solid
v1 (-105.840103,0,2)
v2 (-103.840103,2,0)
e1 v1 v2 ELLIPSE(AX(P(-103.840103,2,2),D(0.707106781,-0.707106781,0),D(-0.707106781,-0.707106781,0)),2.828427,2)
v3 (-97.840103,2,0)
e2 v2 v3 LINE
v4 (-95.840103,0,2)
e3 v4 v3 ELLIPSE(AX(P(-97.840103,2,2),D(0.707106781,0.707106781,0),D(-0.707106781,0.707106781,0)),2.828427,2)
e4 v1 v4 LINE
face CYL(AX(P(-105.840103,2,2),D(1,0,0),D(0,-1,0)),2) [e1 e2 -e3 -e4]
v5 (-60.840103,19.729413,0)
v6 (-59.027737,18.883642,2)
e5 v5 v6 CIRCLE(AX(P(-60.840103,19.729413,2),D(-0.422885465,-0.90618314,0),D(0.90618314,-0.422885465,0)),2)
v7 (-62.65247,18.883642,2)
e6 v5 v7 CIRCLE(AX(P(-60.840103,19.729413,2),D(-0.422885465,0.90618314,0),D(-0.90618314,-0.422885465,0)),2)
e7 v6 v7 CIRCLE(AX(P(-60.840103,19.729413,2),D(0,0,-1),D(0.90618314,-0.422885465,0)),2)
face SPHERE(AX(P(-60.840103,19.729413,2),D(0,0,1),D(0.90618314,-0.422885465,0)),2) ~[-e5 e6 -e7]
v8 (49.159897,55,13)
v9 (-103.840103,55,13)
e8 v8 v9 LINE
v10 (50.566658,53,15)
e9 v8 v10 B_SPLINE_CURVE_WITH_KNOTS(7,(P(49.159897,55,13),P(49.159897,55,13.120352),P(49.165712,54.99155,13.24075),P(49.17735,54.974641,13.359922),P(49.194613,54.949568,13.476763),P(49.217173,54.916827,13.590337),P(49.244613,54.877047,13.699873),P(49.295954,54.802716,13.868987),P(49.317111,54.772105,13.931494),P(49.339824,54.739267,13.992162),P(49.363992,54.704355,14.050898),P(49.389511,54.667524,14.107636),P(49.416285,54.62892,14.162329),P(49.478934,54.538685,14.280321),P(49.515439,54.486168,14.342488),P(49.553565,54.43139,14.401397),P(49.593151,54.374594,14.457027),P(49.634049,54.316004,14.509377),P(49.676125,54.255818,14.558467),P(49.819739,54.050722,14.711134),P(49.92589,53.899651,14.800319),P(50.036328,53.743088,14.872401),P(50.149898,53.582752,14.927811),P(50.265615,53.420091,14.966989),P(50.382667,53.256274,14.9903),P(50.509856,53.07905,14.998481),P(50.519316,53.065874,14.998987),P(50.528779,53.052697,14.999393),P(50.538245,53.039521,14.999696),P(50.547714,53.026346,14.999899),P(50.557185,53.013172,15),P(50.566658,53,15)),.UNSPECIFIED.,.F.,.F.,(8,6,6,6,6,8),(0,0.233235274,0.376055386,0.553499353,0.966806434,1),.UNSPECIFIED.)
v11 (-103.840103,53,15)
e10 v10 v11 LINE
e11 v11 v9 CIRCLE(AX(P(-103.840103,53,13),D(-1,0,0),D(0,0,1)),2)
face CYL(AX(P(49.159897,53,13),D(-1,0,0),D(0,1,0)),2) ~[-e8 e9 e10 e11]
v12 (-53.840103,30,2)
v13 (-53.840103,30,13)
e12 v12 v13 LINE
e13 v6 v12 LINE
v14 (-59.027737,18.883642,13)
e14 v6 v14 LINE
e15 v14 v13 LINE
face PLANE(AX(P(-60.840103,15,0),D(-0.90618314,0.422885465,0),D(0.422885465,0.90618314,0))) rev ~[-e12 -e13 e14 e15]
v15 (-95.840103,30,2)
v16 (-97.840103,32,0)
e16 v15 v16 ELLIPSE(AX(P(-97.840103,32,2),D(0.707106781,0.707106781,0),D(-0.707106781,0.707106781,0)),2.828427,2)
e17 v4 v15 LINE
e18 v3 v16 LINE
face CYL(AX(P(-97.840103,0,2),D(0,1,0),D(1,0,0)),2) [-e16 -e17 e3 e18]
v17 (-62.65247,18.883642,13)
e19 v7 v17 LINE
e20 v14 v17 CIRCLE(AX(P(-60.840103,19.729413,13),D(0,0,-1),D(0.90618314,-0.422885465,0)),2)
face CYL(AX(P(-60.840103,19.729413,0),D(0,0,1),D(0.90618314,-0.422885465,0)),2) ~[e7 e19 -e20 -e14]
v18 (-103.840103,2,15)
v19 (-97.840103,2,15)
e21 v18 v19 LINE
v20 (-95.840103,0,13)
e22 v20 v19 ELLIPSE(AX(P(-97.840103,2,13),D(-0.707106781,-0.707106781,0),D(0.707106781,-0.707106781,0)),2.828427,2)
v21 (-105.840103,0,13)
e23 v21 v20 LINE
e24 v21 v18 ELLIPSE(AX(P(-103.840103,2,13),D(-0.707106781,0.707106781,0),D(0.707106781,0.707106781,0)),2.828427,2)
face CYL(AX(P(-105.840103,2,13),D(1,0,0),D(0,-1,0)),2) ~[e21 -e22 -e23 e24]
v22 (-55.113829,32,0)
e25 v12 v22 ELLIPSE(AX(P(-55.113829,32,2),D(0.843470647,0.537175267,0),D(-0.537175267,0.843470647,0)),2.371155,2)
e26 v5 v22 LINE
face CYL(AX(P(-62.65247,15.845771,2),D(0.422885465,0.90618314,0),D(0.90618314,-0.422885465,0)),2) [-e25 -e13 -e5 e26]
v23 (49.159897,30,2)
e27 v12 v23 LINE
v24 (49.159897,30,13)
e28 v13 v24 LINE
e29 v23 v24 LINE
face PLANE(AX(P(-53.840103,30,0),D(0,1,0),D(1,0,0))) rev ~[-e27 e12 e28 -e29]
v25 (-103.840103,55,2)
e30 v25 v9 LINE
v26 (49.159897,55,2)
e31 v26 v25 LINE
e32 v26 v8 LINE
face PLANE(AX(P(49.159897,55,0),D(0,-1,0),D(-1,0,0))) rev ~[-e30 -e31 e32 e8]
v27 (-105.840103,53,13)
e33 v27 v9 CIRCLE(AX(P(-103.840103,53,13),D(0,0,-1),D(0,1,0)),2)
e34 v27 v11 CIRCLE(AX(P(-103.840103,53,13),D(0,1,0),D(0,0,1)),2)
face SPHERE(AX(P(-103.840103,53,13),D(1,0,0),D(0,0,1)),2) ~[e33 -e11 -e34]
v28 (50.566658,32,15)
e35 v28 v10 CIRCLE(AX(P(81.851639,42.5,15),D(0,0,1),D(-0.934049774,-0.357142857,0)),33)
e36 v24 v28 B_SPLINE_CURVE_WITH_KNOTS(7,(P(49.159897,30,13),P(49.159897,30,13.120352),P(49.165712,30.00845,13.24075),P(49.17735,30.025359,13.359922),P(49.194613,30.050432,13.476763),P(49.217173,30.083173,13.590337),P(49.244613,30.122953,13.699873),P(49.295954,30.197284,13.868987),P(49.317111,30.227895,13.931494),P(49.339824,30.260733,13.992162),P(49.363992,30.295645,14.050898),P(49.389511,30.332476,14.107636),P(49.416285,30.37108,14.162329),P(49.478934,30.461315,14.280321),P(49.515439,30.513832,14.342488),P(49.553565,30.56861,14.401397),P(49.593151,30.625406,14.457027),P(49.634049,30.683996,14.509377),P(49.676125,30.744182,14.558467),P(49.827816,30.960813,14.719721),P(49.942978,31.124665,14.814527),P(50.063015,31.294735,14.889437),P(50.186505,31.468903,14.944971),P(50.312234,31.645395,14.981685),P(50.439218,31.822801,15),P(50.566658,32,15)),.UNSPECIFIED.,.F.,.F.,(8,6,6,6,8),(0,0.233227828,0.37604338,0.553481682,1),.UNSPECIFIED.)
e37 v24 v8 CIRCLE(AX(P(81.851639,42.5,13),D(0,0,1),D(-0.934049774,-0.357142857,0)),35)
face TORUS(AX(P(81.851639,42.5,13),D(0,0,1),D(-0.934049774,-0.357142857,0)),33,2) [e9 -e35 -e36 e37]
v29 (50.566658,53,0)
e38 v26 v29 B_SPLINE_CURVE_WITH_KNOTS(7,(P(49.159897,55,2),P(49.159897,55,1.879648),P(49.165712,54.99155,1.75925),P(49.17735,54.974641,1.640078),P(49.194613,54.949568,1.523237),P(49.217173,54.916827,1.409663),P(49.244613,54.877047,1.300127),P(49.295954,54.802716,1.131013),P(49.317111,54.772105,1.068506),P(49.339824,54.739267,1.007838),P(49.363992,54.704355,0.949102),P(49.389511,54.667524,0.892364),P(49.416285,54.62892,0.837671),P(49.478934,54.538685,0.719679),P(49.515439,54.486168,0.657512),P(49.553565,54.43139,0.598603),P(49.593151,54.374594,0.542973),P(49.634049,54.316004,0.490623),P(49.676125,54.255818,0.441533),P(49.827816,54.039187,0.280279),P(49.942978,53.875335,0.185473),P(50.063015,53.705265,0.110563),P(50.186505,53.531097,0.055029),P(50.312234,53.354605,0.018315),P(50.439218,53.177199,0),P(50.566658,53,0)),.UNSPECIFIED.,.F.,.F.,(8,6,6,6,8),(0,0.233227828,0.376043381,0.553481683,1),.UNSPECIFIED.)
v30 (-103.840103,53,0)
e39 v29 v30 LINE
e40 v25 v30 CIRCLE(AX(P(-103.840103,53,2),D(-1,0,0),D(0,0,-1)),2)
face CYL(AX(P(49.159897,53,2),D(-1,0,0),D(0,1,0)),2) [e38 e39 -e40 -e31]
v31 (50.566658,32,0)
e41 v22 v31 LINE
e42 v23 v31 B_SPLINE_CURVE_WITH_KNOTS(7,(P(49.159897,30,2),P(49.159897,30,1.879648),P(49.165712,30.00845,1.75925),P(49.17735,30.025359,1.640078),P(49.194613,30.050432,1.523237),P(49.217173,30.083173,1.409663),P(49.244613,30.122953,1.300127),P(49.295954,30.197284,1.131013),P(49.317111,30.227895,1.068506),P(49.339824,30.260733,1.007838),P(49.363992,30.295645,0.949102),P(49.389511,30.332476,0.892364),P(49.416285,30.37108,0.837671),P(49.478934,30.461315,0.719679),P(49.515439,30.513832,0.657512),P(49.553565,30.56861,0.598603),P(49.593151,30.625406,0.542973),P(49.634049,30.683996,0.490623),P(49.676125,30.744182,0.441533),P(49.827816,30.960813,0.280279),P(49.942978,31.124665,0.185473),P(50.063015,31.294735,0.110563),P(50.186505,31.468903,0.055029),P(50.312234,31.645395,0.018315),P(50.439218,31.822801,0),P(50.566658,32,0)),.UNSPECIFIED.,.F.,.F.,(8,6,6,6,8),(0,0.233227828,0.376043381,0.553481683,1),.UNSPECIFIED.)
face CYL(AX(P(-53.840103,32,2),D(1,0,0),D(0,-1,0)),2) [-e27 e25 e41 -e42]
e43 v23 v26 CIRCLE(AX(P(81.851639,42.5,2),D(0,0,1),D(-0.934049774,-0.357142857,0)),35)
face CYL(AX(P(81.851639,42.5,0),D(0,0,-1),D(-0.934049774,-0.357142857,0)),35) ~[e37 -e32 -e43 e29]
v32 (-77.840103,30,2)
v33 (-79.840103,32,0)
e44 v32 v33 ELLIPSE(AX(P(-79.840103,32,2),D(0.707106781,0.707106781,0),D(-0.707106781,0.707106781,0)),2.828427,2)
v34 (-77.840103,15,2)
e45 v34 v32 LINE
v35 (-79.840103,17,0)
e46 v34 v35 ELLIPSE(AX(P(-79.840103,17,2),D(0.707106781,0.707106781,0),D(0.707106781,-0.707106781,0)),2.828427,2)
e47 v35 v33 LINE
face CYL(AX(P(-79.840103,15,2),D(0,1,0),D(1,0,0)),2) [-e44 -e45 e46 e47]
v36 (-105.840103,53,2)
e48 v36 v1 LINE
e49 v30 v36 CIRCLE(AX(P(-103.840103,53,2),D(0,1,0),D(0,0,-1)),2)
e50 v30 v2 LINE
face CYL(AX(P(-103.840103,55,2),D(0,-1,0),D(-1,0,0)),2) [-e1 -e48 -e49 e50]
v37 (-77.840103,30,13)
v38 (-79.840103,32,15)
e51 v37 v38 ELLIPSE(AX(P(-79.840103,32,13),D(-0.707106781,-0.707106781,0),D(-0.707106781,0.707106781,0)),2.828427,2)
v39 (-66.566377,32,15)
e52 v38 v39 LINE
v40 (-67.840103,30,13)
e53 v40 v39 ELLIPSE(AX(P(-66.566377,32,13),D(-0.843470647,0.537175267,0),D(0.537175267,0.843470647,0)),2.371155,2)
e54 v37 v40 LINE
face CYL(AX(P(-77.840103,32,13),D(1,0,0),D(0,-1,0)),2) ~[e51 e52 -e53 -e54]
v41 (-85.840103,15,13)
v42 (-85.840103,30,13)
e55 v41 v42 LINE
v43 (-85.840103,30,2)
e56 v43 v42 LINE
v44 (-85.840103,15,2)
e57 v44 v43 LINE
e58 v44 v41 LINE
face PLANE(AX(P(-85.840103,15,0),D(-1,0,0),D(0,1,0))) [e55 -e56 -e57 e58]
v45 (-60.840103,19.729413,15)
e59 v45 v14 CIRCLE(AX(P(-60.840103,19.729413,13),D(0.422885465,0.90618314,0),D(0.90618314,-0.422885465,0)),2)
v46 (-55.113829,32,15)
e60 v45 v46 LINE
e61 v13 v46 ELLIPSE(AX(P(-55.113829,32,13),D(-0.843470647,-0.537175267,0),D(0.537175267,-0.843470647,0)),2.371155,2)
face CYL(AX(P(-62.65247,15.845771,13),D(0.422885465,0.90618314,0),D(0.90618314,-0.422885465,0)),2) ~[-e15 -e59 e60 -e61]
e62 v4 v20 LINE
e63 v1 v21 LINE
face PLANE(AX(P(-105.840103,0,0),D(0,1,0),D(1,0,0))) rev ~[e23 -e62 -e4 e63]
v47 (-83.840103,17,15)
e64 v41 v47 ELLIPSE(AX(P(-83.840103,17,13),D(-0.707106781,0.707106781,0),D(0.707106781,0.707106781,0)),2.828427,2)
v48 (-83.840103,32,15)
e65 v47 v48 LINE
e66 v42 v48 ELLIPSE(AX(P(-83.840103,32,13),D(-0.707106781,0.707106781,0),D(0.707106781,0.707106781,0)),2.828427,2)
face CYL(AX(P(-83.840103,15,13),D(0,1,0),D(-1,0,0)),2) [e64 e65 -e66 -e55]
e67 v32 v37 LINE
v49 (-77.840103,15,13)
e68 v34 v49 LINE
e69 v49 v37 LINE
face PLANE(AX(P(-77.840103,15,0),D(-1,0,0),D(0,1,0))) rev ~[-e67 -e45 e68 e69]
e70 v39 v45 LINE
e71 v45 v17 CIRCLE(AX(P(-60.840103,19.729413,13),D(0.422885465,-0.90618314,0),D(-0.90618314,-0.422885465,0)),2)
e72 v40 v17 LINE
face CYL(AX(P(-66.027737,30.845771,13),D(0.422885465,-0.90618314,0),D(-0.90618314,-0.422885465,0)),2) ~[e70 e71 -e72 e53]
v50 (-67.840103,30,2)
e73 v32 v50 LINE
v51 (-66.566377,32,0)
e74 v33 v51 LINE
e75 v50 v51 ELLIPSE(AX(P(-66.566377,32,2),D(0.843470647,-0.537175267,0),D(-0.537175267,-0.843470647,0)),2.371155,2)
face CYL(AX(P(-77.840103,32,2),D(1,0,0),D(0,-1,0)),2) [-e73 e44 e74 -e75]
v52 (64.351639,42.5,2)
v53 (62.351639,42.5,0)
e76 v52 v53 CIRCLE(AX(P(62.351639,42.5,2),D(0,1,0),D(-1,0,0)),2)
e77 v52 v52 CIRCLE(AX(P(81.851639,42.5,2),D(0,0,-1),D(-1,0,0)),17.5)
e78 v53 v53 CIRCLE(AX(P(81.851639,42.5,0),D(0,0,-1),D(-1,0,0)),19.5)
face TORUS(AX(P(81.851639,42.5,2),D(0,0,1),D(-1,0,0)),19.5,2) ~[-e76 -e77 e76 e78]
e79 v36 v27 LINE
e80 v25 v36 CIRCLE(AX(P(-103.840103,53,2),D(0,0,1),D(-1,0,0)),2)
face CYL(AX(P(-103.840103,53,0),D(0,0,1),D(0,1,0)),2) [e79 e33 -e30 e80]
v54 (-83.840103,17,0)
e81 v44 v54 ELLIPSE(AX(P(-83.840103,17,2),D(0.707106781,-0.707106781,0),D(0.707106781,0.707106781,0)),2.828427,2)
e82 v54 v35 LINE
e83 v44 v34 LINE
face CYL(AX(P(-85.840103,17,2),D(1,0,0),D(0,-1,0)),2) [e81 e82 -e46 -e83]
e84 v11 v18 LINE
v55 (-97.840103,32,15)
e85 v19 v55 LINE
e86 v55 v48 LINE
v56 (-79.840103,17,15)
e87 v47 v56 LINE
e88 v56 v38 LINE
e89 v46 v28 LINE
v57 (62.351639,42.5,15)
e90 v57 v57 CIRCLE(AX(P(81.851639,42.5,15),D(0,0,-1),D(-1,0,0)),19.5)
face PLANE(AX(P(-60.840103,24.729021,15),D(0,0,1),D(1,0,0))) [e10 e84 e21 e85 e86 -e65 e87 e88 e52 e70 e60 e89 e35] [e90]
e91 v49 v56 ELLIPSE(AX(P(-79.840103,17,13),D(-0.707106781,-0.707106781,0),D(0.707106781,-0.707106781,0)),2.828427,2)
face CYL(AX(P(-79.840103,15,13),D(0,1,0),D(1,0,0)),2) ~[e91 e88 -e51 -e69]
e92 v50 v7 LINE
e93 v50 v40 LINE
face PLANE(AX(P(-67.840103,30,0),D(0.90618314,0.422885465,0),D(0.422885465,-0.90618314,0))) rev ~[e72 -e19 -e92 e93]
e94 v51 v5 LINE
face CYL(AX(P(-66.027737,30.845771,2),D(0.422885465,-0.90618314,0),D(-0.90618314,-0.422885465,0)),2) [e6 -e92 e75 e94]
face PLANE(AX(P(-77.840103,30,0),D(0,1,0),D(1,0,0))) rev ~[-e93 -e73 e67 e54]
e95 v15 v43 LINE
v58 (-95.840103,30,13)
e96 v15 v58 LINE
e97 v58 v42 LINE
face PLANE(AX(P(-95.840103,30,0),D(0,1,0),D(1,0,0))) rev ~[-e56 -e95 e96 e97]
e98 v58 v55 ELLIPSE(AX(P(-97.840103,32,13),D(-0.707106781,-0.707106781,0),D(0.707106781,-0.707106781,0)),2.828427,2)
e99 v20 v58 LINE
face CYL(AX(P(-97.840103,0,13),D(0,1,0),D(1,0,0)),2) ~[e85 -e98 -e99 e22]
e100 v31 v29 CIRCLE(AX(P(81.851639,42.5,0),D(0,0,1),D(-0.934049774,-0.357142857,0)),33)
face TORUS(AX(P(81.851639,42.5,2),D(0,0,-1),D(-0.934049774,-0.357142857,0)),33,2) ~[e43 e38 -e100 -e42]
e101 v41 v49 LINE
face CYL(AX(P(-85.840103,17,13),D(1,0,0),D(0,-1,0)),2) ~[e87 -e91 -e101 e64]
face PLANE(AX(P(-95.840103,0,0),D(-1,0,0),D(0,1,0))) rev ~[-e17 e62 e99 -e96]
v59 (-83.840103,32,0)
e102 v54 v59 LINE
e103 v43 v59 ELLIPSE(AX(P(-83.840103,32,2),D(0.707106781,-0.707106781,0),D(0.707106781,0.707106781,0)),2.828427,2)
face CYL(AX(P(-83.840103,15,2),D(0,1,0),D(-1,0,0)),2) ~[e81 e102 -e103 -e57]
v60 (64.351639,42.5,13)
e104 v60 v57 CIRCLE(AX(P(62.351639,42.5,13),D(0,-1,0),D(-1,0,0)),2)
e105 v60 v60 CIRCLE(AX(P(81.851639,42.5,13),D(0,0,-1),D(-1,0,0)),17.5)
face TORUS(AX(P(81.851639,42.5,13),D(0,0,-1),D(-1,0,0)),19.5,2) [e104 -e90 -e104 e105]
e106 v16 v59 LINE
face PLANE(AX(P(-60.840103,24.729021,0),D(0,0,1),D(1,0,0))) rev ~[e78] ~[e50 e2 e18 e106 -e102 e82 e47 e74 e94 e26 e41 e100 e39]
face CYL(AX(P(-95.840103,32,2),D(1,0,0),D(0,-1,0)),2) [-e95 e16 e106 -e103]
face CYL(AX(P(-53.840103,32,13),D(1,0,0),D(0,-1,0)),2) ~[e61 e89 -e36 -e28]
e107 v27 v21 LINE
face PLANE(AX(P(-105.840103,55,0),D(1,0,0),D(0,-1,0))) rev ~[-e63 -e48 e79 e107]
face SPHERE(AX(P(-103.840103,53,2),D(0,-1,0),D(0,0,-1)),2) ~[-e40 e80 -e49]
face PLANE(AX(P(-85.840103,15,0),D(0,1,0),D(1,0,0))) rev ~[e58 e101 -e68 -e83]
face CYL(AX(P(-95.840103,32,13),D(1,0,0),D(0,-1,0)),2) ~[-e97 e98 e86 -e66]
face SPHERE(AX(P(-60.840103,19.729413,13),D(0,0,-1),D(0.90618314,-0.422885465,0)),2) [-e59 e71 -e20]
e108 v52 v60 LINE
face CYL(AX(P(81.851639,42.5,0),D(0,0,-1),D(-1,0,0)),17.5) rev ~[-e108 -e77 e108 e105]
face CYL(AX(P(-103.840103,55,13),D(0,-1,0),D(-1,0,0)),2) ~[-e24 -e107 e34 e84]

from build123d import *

# Parameters (mm, degrees)
F0_W     = 10
F0_H     = 30
F0_W_2   = 8
F0_H_2   = 15
F1_DEPTH = 15
F2_R     = 2


# Not quite as in the source:
# - a feature of the source that left no trace in its solid (it failed there, or was rolled back) is left out


with BuildPart() as f1:
    # F0 (on Top) → F1 (new body)
    with BuildSketch(Plane.XY):
        Polygon((-60.840103223, 15), (-53.840103223, 30), (-67.840103223, 30), align=None)
        with Locations((-100.840103223, 15)):
            Rectangle(F0_W, F0_H)
        with Locations((-81.840103223, 22.5)):
            Rectangle(F0_W_2, F0_H_2)
        with BuildLine():
            ThreePointArc((49.159896777, 30), (116.8516388535, 42.5), (49.159896777, 55))
            Line((49.159896777, 55), (49.159896777, 42.5))
            Line((49.159896777, 42.5), (49.159896777, 30))
        make_face()
        with BuildLine():
            ThreePointArc((99.3516388535, 42.5), (81.8516388535, 25), (64.3516388535, 42.5))
            ThreePointArc((64.3516388535, 42.5), (81.8516388535, 60), (99.3516388535, 42.5))
        make_face(mode=Mode.SUBTRACT)
        Polygon((33.3130955696, 42.5), (-105.840103223, 42.5), (-105.840103223, 30), (-95.840103223, 30), (-85.840103223, 30), (-77.840103223, 30), (-67.840103223, 30), (-53.840103223, 30), (49.159896777, 30), (49.159896777, 42.5), align=None)
        Polygon((49.159896777, 55), (-105.840103223, 55), (-105.840103223, 42.5), (33.3130955696, 42.5), (49.159896777, 42.5), align=None)
    extrude(amount=F1_DEPTH)

    # F2
    f2_edges = [f1.edges().sort_by_distance(p)[0] for p in [
        (-28.340103, 55, 15),
        (-100.840103, 0, 15),
        (-105.840103, 27.5, 15),
        (-90.840103, 30, 15),
        (-95.840103, 15, 15),
        (-85.840103, 22.5, 15),
        (-81.840103, 15, 15),
        (-77.840103, 22.5, 15),
        (-72.840103, 30, 15),
        (-64.340103, 22.5, 15),
        (-2.340103, 30, 15),
        (116.851639, 42.5, 15),
        (99.351639, 42.5, 15),
        (-57.340103, 22.5, 0),
        (-105.840103, 27.5, 0),
        (116.851639, 42.5, 0),
        (-2.340103, 30, 0),
        (-81.840103, 15, 0),
        (-77.840103, 22.5, 0),
        (-95.840103, 15, 0),
        (-100.840103, 0, 0),
        (99.351639, 42.5, 0),
        (-28.340103, 55, 0),
        (-105.840103, 55, 7.5),
        (-64.340103, 22.5, 0),
        (-60.840103, 15, 7.5),
        (-57.340103, 22.5, 15),
        (-90.840103, 30, 0),
        (-85.840103, 22.5, 0),
        (-72.840103, 30, 0),
    ]]
    fillet(f2_edges, radius=F2_R)


solid = f1.part
